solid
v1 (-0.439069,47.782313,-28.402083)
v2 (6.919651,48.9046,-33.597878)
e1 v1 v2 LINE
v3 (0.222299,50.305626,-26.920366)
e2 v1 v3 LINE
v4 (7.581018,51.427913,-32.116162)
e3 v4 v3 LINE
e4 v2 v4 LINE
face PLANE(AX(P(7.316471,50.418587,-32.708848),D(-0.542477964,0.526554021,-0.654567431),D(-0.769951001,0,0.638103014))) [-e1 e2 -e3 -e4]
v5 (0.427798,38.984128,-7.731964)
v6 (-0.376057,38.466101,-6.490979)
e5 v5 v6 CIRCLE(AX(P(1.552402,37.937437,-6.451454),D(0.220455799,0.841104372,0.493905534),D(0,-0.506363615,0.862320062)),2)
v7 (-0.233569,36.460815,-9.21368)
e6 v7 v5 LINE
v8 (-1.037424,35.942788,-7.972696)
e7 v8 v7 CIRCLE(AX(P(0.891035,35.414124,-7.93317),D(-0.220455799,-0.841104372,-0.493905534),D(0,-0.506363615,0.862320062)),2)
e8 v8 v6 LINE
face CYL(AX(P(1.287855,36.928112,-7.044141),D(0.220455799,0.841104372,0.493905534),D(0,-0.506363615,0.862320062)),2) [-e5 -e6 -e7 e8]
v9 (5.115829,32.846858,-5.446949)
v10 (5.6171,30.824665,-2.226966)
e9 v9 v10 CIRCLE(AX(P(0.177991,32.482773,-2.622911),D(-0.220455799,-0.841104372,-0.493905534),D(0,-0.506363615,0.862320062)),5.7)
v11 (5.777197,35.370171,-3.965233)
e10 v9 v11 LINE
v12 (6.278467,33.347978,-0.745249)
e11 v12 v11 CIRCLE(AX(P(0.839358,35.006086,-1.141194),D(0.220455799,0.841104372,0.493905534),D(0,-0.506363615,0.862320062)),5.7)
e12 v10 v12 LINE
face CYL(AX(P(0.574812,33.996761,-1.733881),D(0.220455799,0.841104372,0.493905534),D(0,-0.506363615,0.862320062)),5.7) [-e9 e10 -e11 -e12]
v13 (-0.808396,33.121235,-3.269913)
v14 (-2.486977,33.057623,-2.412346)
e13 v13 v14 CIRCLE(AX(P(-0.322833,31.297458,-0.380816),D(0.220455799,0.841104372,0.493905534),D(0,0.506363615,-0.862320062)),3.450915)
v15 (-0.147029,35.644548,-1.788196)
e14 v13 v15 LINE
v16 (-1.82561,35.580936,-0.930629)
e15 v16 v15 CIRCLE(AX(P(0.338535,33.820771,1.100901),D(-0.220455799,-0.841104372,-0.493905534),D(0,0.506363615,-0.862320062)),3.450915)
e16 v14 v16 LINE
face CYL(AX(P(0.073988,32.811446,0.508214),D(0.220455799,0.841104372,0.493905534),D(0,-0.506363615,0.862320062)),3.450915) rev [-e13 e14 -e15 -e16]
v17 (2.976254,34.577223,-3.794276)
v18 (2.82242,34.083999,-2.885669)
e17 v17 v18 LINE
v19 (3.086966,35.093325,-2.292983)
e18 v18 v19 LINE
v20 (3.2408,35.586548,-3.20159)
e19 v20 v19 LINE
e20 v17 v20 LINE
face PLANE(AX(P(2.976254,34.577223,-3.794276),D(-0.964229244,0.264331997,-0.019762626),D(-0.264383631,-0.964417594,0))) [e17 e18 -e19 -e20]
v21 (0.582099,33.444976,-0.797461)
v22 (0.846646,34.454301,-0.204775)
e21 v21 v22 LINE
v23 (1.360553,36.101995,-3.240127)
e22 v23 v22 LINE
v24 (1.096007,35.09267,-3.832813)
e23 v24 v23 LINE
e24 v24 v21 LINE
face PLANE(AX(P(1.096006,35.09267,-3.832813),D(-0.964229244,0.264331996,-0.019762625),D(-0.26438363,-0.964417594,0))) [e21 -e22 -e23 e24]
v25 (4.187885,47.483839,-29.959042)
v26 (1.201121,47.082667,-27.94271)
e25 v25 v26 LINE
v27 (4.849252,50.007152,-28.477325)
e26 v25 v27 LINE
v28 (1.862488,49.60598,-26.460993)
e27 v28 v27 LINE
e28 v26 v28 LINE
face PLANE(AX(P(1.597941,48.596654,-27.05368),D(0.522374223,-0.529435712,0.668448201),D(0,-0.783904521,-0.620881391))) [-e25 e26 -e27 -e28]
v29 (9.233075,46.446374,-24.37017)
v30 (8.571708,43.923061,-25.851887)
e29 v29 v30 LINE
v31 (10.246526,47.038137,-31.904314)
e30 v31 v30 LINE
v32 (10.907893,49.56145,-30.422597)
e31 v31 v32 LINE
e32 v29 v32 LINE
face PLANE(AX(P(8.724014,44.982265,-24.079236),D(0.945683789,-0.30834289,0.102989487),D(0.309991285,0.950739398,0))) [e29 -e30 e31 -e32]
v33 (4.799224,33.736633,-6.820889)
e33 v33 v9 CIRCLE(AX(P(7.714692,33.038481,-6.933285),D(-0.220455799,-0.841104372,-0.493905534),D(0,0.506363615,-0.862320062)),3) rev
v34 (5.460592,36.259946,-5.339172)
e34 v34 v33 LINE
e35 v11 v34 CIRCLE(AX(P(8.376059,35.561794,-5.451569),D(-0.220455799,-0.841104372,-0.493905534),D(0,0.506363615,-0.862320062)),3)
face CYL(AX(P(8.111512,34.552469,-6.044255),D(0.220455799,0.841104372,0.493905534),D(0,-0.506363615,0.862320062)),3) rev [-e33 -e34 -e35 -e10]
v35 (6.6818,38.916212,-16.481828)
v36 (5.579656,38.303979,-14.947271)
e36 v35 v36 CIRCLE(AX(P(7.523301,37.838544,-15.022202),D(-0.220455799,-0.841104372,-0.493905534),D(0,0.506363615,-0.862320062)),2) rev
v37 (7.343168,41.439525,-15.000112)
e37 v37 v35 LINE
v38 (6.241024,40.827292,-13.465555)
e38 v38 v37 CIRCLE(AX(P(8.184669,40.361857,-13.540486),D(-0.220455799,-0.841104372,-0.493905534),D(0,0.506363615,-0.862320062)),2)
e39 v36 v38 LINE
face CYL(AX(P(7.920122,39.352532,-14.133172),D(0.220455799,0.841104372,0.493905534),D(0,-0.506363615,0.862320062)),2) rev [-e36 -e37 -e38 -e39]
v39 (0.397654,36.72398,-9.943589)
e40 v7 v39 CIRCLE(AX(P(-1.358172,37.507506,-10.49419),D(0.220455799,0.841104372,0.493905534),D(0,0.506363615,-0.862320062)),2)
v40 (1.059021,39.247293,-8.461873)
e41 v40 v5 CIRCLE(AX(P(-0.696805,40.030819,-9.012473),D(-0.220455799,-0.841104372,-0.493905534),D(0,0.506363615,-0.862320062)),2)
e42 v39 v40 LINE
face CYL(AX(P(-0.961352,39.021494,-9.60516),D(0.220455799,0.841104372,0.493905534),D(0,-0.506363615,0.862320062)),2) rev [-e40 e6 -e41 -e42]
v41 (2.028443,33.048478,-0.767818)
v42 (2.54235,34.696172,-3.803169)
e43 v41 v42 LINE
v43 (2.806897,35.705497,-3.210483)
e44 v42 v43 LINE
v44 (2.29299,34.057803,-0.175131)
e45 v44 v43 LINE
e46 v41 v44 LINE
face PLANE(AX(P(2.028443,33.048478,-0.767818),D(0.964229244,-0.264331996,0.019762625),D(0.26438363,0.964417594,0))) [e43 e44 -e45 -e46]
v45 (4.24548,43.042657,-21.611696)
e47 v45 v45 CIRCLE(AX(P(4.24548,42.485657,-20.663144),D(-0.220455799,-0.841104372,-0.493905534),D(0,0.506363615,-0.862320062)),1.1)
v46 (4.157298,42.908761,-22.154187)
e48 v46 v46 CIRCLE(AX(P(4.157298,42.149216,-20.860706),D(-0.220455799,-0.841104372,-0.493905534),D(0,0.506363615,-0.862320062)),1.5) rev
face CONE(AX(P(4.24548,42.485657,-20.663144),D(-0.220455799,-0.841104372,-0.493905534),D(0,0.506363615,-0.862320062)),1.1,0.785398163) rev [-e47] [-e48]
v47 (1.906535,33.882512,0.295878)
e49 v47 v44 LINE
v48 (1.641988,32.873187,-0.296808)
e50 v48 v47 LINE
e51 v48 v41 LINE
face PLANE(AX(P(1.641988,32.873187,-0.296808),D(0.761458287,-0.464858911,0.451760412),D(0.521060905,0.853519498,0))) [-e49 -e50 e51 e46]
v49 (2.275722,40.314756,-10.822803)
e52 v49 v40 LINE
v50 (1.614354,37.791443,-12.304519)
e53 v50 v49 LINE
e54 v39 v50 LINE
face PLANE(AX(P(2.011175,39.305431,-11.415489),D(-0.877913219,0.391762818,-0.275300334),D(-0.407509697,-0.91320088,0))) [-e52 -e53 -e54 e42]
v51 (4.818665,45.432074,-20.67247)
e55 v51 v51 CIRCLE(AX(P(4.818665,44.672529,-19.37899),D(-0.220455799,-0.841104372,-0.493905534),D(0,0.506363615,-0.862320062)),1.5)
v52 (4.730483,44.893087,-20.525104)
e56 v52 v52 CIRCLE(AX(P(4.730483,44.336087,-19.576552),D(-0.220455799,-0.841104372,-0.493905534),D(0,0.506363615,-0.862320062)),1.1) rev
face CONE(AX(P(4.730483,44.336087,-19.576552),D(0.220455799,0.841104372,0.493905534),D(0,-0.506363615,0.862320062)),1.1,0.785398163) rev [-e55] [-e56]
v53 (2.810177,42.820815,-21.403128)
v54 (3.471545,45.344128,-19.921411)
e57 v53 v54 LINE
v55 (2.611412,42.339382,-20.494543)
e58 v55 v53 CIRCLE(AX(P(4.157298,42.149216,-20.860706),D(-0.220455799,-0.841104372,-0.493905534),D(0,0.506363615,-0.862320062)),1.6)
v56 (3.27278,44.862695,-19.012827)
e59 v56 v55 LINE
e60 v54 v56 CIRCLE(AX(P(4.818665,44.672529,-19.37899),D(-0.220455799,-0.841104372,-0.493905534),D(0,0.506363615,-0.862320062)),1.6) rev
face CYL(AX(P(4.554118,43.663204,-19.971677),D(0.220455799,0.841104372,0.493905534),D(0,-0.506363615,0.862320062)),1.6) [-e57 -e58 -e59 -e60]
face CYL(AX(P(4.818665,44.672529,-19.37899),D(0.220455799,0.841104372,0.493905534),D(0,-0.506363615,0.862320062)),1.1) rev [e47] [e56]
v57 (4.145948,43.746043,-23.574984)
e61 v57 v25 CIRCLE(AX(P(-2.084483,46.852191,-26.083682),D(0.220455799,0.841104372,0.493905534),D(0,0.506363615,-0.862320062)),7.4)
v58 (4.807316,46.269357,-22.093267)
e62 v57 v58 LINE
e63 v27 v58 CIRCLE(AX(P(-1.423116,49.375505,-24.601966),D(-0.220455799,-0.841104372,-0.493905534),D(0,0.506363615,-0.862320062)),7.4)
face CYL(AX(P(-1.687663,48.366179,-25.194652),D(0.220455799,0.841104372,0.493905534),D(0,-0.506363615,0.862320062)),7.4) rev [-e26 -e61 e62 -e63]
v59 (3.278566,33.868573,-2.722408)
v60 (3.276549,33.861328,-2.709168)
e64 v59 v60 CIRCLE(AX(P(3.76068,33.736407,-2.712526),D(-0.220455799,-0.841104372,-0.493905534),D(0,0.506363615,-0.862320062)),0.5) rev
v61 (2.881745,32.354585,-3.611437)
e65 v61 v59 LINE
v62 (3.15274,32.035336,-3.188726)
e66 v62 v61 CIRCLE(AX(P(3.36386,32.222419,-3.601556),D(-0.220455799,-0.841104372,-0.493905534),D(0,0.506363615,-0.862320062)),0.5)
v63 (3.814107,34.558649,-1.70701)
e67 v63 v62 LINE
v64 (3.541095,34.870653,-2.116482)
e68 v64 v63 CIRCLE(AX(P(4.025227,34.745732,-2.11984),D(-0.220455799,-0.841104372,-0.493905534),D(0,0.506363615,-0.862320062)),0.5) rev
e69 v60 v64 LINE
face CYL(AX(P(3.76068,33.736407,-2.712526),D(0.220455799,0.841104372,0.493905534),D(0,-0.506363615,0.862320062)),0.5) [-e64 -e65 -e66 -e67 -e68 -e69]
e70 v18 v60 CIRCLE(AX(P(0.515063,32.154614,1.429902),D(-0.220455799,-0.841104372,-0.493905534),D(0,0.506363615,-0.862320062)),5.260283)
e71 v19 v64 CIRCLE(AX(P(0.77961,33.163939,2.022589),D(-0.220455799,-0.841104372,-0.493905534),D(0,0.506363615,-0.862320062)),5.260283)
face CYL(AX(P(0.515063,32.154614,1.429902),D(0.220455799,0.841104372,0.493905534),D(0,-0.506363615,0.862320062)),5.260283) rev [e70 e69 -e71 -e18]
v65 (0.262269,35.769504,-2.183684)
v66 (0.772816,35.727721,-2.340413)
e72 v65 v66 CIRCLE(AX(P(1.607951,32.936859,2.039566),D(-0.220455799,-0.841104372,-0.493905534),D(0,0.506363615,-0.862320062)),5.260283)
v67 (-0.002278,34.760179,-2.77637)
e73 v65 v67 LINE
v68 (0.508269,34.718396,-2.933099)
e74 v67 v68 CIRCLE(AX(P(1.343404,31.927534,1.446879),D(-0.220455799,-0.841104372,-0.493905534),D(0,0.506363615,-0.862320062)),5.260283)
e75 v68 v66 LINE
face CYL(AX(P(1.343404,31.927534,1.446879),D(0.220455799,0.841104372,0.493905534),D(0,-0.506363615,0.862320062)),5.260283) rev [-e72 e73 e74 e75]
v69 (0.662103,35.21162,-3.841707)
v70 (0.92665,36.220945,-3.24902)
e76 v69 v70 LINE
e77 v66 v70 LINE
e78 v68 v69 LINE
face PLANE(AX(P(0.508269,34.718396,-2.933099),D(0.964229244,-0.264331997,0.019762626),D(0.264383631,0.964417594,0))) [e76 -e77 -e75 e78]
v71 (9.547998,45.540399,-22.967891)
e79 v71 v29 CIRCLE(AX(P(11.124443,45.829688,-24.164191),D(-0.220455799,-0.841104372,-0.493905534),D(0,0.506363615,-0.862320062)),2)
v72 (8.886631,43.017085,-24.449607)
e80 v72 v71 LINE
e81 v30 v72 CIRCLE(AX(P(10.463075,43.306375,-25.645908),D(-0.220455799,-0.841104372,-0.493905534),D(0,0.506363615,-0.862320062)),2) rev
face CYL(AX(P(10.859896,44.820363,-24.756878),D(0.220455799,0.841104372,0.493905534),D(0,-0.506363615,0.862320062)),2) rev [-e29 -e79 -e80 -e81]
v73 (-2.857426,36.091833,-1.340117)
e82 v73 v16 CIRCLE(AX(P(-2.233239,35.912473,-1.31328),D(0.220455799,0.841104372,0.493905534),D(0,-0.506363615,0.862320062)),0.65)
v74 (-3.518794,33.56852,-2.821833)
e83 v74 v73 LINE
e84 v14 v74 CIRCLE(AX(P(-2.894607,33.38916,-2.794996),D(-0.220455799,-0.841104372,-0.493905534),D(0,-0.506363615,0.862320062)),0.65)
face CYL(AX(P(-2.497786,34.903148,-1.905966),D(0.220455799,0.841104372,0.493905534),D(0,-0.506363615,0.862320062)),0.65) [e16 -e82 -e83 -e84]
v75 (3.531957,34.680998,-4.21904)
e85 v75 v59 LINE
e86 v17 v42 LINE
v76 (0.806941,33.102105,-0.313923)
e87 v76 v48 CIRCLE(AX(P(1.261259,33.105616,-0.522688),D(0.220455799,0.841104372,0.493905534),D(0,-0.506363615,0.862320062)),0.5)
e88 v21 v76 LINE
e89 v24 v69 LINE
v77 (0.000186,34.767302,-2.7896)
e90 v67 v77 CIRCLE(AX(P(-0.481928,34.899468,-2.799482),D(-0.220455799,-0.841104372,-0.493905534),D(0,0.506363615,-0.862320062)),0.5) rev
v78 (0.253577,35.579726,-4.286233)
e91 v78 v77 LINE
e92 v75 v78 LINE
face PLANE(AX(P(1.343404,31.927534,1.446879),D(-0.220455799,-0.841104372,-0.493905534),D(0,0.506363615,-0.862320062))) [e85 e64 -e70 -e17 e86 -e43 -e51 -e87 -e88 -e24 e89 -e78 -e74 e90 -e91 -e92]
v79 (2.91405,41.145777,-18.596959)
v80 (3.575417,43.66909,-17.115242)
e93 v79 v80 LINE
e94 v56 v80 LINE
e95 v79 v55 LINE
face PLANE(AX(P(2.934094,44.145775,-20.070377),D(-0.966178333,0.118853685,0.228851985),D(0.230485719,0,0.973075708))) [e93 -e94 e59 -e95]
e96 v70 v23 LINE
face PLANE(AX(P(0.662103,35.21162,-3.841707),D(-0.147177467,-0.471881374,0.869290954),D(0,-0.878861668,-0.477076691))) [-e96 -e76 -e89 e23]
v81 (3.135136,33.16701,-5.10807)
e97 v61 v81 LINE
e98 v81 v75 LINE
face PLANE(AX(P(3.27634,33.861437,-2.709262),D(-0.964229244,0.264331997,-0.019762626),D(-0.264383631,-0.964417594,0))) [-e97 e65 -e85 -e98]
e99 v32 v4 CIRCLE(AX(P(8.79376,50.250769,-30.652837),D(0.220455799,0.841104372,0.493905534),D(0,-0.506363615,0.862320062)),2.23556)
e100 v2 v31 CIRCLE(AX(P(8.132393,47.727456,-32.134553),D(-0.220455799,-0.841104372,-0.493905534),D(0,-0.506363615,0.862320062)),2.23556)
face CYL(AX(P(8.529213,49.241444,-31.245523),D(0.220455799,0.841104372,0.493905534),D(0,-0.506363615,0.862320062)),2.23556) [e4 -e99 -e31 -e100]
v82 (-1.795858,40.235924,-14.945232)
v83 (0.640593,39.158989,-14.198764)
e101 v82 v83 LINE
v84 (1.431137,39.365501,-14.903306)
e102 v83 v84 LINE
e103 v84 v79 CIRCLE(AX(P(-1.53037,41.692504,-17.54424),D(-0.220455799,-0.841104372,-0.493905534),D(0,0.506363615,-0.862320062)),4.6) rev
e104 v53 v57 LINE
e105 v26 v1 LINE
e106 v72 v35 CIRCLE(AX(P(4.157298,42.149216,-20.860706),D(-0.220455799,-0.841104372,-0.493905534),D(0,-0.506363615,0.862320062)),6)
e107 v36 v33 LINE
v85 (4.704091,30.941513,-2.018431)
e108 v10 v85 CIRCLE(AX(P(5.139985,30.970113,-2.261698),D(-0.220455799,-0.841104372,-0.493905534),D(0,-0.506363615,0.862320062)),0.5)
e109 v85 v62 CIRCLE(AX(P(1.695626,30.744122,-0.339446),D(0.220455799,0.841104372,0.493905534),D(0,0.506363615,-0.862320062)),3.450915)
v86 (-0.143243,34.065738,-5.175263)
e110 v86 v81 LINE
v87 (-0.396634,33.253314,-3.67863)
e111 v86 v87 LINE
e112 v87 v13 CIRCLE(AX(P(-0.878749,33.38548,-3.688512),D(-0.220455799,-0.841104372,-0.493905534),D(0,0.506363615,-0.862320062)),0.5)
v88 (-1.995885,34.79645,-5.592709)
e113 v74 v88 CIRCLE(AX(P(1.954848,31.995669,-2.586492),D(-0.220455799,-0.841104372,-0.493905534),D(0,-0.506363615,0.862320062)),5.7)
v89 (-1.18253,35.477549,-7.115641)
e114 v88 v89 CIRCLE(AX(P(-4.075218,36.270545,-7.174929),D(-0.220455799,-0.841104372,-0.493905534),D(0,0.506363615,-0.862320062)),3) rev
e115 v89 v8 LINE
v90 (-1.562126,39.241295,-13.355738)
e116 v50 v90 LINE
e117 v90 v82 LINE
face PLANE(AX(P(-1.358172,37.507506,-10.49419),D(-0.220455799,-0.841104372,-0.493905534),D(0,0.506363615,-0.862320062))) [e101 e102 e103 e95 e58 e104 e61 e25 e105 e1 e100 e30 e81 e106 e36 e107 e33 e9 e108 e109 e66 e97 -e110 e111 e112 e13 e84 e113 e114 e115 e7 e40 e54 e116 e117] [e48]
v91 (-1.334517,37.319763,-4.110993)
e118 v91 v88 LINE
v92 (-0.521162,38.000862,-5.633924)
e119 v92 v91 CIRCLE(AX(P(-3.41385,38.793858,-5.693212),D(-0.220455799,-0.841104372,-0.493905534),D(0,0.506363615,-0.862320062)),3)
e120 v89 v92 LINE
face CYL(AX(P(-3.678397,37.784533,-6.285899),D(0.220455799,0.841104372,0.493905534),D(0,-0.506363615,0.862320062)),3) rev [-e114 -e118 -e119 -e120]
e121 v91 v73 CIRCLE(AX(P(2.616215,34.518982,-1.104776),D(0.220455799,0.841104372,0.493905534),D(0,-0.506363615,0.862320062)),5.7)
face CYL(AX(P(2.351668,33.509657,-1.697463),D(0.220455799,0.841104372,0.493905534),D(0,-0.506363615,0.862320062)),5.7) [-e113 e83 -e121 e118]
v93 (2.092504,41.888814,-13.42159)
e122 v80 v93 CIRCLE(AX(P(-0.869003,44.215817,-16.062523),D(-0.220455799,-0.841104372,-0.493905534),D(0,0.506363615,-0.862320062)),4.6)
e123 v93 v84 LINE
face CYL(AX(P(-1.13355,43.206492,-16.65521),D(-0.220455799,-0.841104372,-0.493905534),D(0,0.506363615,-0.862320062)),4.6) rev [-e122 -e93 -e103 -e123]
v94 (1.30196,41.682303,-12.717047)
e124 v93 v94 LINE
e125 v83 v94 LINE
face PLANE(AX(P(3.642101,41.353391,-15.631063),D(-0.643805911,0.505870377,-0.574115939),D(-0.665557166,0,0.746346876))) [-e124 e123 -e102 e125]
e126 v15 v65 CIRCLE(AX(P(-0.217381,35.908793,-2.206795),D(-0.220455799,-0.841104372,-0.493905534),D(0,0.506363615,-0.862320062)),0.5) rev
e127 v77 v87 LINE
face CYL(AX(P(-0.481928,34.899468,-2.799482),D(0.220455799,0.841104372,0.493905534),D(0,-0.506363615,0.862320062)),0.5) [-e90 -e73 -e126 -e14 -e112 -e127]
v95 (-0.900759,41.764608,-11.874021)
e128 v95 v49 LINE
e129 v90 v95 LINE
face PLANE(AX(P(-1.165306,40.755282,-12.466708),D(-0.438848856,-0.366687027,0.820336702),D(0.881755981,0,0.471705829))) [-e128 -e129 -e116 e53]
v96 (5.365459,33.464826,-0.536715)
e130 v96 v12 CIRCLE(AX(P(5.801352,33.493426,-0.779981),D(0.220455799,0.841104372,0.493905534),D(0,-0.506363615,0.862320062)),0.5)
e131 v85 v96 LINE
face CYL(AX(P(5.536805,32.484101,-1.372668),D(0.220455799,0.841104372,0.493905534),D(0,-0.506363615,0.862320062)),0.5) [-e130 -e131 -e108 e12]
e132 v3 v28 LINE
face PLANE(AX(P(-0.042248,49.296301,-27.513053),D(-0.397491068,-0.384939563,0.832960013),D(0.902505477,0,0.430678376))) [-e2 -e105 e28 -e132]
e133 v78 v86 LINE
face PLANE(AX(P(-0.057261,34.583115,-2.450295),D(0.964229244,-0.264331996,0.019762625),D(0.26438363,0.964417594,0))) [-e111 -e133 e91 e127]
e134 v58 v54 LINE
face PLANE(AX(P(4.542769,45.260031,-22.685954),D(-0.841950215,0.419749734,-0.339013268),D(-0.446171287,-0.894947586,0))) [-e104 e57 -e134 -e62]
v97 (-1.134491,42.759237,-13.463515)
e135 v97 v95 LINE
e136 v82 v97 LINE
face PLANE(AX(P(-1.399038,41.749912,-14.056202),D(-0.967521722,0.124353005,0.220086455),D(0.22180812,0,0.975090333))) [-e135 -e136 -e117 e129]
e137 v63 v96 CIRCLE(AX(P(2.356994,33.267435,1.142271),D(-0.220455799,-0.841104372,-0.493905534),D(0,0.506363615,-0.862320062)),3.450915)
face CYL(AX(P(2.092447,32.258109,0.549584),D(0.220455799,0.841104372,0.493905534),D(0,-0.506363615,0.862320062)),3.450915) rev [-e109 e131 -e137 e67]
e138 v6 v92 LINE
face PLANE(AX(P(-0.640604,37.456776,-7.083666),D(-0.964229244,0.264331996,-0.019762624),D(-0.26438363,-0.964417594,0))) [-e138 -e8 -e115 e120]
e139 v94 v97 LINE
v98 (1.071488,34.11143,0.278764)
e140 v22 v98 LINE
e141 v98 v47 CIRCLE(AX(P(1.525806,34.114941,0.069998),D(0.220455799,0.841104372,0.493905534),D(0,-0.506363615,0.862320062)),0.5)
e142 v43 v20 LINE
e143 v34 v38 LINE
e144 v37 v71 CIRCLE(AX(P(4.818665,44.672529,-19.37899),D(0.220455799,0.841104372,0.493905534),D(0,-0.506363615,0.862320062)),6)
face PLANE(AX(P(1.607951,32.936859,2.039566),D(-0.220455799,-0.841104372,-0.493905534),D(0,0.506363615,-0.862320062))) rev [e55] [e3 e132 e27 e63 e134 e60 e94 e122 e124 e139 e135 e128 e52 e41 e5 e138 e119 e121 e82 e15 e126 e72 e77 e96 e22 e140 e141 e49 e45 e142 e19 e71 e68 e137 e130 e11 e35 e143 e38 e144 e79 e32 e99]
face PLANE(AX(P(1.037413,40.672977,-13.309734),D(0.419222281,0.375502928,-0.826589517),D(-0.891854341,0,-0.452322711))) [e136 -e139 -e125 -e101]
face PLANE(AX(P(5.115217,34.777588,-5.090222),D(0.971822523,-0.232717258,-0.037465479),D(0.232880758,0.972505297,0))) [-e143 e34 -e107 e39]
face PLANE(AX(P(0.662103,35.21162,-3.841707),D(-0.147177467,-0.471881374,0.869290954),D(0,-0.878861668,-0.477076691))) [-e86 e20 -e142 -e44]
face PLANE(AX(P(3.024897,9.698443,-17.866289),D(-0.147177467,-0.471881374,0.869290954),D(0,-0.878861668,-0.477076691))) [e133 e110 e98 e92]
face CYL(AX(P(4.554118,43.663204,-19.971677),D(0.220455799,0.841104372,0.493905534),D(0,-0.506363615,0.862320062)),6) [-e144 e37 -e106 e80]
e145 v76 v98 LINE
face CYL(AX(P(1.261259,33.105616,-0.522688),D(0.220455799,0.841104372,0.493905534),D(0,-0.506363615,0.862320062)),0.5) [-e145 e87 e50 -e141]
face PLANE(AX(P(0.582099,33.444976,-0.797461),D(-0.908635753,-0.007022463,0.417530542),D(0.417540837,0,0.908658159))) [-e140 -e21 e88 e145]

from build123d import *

# Parameters (mm, degrees)
BOSS_EXTRU_1_DEPTH      = 1.2
BOSS_EXTRU_2_DEPTH      = 1.8
BOSS_EXTRU_3_DEPTH      = 1.2
ENL_V_MAT_EXTRU_1_DEPTH = 0.5
D_GAGEMENT_11_D         = 2.2
D_GAGEMENT_11_DEPTH     = 20.852957306
CHANFREIN1_SIZE         = 0.4
CONG_1_R                = 0.5
CONG_2_R                = 1.6
CONG_3_R                = 2
CONG_4_R                = 3
CONG_5_R                = 4.6


with BuildPart() as part:
    # Esquisse1 → Boss.-Extru.1 (new body)
    with BuildSketch(Plane(origin=(6.407585618, 24.446842904, 14.355449102), x_dir=(-0.9673252584845775, 0.25353864458450015, 0), z_dir=(0.22045579862678236, 0.8411043718426235, 0.49390553400326775))):
        with BuildLine():
            Line((8.3107933, -19.201337536), (8.28703703, -20.246295369))
            Line((8.28703703, -20.246295369), (5.887657003, -20.191747407))
            Line((5.887657003, -20.191747407), (5.911413273, -19.146789578))
            ThreePointArc((5.911413273, -19.146789578), (5.661071779, -19.051658576), (5.415896386, -18.943909805))
            Line((5.415896386, -18.943909805), (5.424424098, -18.568804632))
            ThreePointArc((5.424424098, -18.568804632), (4.220103871, -18.05373822), (3.294482937, -17.126966131))
            ThreePointArc((3.294482937, -17.126966131), (2.75302589, -16.9231517), (2.381681142, -17.366794726))
            ThreePointArc((2.381681142, -17.366794726), (2.674699472, -19.679905075), (3.869384364, -21.682170602))
            Line((3.869384364, -21.682170602), (4.36844048, -33.2537312))
            ThreePointArc((4.36844048, -33.2537312), (0.72021692, -37.984660137), (2.965783206, -43.520782952))
            Line((2.965783206, -43.520782952), (2.014262513, -51.497693901))
            ThreePointArc((2.014262513, -51.497693901), (3.190838358, -53.739695244), (5.705653115, -53.445403756))
            Line((5.705653115, -53.445403756), (12.539385017, -47.469897623))
            Line((12.539385017, -47.469897623), (10.775401018, -46.941589091))
            Line((10.775401018, -46.941589091), (7.98794124, -49.26050339))
            ThreePointArc((7.98794124, -49.26050339), (6.551054488, -45.710950333), (7.080832223, -41.918417408))
            Line((7.080832223, -41.918417408), (8.354436867, -38.910332559))
            Line((8.354436867, -38.910332559), (6.961586789, -33.804829327))
            Line((6.961586789, -33.804829327), (9.308655621, -31.135148323))
            Line((9.308655621, -31.135148323), (11.938540853, -31.993635375))
            Line((11.938540853, -31.993635375), (11.460268944, -30.16561351))
            Line((11.460268944, -30.16561351), (8.019985695, -28.956643067))
            Line((8.019985695, -28.956643067), (8.926287357, -26.241418493))
            ThreePointArc((8.926287357, -26.241418493), (9.144900582, -25.787147852), (9.470162743, -25.401975054))
            ThreePointArc((9.470162743, -25.401975054), (9.938854473, -24.754281649), (10.116412195, -23.974761322))
            Line((10.116412195, -23.974761322), (10.163650136, -21.896924134))
            ThreePointArc((10.163650136, -21.896924134), (11.408775744, -20.142199434), (11.914735193, -18.050931496))
            ThreePointArc((11.914735193, -18.050931496), (11.515962336, -17.420273087), (10.787100814, -17.579993788))
            ThreePointArc((10.787100814, -17.579993788), (9.893990524, -18.276347599), (8.823545803, -18.646080909))
            Line((8.823545803, -18.646080909), (8.815018092, -19.021186079))
            ThreePointArc((8.815018092, -19.021186079), (8.565199371, -19.117681561), (8.3107933, -19.201337536))
        make_face()
    extrude(amount=-BOSS_EXTRU_1_DEPTH)

    # Esquisse2 → Boss.-Extru.2 (add)
    with BuildSketch(Plane(origin=(6.14303866, 23.437517658, 13.762762461), x_dir=(0.975396965779486, -0.19010345790327618, -0.11163079521973214), z_dir=(-0.22045579862678244, -0.8411043718426235, -0.493905534003268))):
        with BuildLine():
            Line((-7.732315065, -33.261580929), (-7.492687467, -31.387284642))
            Line((-7.492687467, -31.387284642), (-4.236084553, -29.746645792))
            Line((-4.236084553, -29.746645792), (-5.483474276, -27.170244025))
            ThreePointArc((-5.483474276, -27.170244025), (-5.758598922, -26.747798778), (-6.130618981, -26.407571451))
            ThreePointArc((-6.130618981, -26.407571451), (-6.6785848, -25.825409837), (-6.954750137, -25.075135626))
            Line((-6.954750137, -25.075135626), (-7.268355612, -23.020557711))
            ThreePointArc((-7.268355612, -23.020557711), (-8.728453798, -21.440206536), (-9.498708997, -19.431200941))
            ThreePointArc((-9.498708997, -19.431200941), (-9.184201764, -18.754565869), (-8.440866411, -18.819391589))
            ThreePointArc((-8.440866411, -18.819391589), (-7.465747068, -19.39532291), (-6.356693226, -19.624569933))
            Line((-6.356693226, -19.624569933), (-6.113459598, -21.218108564))
            Line((-6.113459598, -21.218108564), (-2.752387602, -20.7050832))
            Line((-2.752387602, -20.7050832), (-2.99562123, -19.111544567))
            ThreePointArc((-2.99562123, -19.111544567), (-1.86739276, -18.44612655), (-1.068413166, -17.408190027))
            ThreePointArc((-1.068413166, -17.408190027), (-0.557603097, -17.13654848), (-0.132375231, -17.528845966))
            ThreePointArc((-0.132375231, -17.528845966), (-0.126005289, -19.86043312), (-1.053747455, -21.999506214))
            Line((-1.053747455, -21.999506214), (-0.06308502, -33.539378814))
            ThreePointArc((-0.06308502, -33.539378814), (4.162318019, -37.762788918), (2.646077122, -43.541390591))
            Line((2.646077122, -43.541390591), (4.613821412, -51.330131332))
            ThreePointArc((4.613821412, -51.330131332), (3.734816377, -53.704631466), (1.203030531, -53.735634151))
            Line((1.203030531, -53.735634151), (-6.341302035, -48.686910412))
            Line((-6.341302035, -48.686910412), (-4.659741241, -47.936508686))
            Line((-4.659741241, -47.936508686), (-1.59763996, -49.878371526))
            ThreePointArc((-1.59763996, -49.878371526), (-0.628345248, -46.173720638), (-1.640634697, -42.480586398))
            Line((-1.640634697, -42.480586398), (-3.289886063, -39.660903229))
            Line((-3.289886063, -39.660903229), (-2.564020762, -34.418831676))
            Line((-2.564020762, -34.418831676), (-5.234407859, -32.072566236))
            Line((-5.234407859, -32.072566236), (-7.732315065, -33.261580929))
        make_face()
    extrude(amount=BOSS_EXTRU_2_DEPTH)

    # Esquisse3 → Boss.-Extru.3 (add)
    with BuildSketch(Plane(origin=(6.407585618, 24.446842904, 14.355449102), x_dir=(-0.9673252584845775, 0.25353864458450015, 0), z_dir=(0.22045579862678236, 0.8411043718426235, 0.49390553400326775))):
        with BuildLine():
            Line((7.837153276, -20.236067623), (7.91651501, -16.745213642))
            Line((7.91651501, -16.745213642), (7.612088308, -16.189112778))
            ThreePointArc((7.612088308, -16.189112778), (7.184869542, -15.929335708), (6.746286617, -16.169429478))
            Line((6.746286617, -16.169429478), (6.416902492, -16.711121168))
            Line((6.416902492, -16.711121168), (6.337540759, -20.201975149))
            Line((6.337540759, -20.201975149), (7.837153276, -20.236067623))
        make_face()
    extrude(amount=-BOSS_EXTRU_3_DEPTH)

    # Esquisse4 → Enlèv. mat.-Extru.1 (cut)
    with BuildSketch(Plane(origin=(2.951307786, 9.462502662, -17.431643664), x_dir=(0.9891101016622393, -0.07021493892393531, 0.12934863409260489), z_dir=(-0.1471774669904145, -0.47188137397705354, 0.8692909536535013))):
        Polygon((0.512643013, 28.466993484), (-2.801830697, 29.224795587), (-3.203020046, 27.470074211), (0.111453664, 26.712272108), align=None)
    extrude(amount=-ENL_V_MAT_EXTRU_1_DEPTH, mode=Mode.SUBTRACT)

    # Dégagement #11
    with Locations(Plane(origin=(6.407585618, 24.446842904, 14.355449102), x_dir=(0.975396965779486, -0.19010345790327618, -0.11163079521973214), z_dir=(0.22045579862678244, 0.8411043718426235, 0.493905534003268))):
        with Locations((-1.628998725, 39.331434949)):
            Hole(D_GAGEMENT_11_D / 2, depth=D_GAGEMENT_11_DEPTH)

    # Chanfrein1
    chanfrein1_edges = [part.edges().sort_by_distance(p)[0] for p in [
        (5.230234471, 41.940101873, -20.983500369),
        (5.891601867, 44.463414989, -19.501783767),
    ]]
    chamfer(chanfrein1_edges, length=CHANFREIN1_SIZE)

    # Congé1
    # the kernel refuses this fillet: 0.5 mm, written as the material it takes off along each edge
    with BuildSketch(Plane(origin=(-0.669204138, 32.248368886, -3.821283326), x_dir=(0.1471774658030771, 0.4718813743025472, -0.869290953677837), z_dir=(0.2204557986267829, 0.8411043718426239, 0.4939055340032671))) as cong_1_piece_1_section:
        with BuildLine():
            CenterArc((0.390324185, 0.5), CONG_1_R, 196.972621799, 73.027378201)
            ThreePointArc((-0.087897992, 0.354042645), (-0.039267564, 0.178183579), (0, 0))
            Line((0, 0), (0.390324185, 0))
        make_face()
    cong_1_piece_1 = extrude(amount=4.951620926, mode=Mode.PRIVATE)
    cong_1_piece_1 = split(cong_1_piece_1, bisect_by=Plane(origin=(0.003725605, 34.762970093, -2.783803292), z_dir=(-0.22045579862678238, -0.8411043718426235, -0.4939055340032678)), keep=Keep.TOP, mode=Mode.PRIVATE)
    cong_1_piece_1 = cong_1_piece_1 - Plane(origin=(1.037432714, 30.760160969, 0.761385364), x_dir=(-0.25577403854650904, 0.5384942223933797, -0.8028721029245929), z_dir=(0.22045579862678244, 0.8411043718426237, 0.49390553400326787)) * Cylinder(5.260282908, 12, mode=Mode.PRIVATE)
    add(cong_1_piece_1, mode=Mode.SUBTRACT)
    with BuildSketch(Plane(origin=(-0.669204138, 32.248368886, -3.821283326), x_dir=(0.1471774658030771, 0.4718813743025472, -0.869290953677837), z_dir=(0.2204557986267829, 0.8411043718426239, 0.4939055340032671))) as cong_1_piece_2_section:
        with BuildLine():
            CenterArc((0.390324185, 0.5), CONG_1_R, 196.972621799, 73.027378201)
            ThreePointArc((-0.087897992, 0.354042645), (-0.039267564, 0.178183579), (0, 0))
            Line((0, 0), (0.390324185, 0))
        make_face()
    cong_1_piece_2 = extrude(amount=4.951620926, mode=Mode.PRIVATE)
    cong_1_piece_2 = split(cong_1_piece_2, bisect_by=Plane(origin=(-0.122705541, 34.636774261, -2.512463256), z_dir=(-0.22045579862678238, -0.8411043718426235, -0.4939055340032678)), keep=Keep.TOP, mode=Mode.PRIVATE)
    cong_1_piece_2 = cong_1_piece_2 & Plane(origin=(1.037432714, 30.760160969, 0.761385364), x_dir=(-0.25577403854650904, 0.5384942223933797, -0.8028721029245929), z_dir=(0.22045579862678244, 0.8411043718426237, 0.49390553400326787)) * Cylinder(5.260282908, 12, mode=Mode.PRIVATE)
    add(cong_1_piece_2, mode=Mode.SUBTRACT)
    with BuildSketch(Plane(origin=(-0.669204138, 32.248368886, -3.821283326), x_dir=(0.1471774658030771, 0.4718813743025472, -0.869290953677837), z_dir=(0.2204557986267829, 0.8411043718426239, 0.4939055340032671))) as cong_1_piece_3_section:
        with BuildLine():
            CenterArc((0.390324185, 0.5), CONG_1_R, 196.972621799, 73.027378201)
            ThreePointArc((-0.087897992, 0.354042645), (-0.039267564, 0.178183579), (0, 0))
            Line((0, 0), (0.390324185, 0))
        make_face()
    cong_1_piece_3 = extrude(amount=4.951620926, mode=Mode.PRIVATE)
    cong_1_piece_3 = split(cong_1_piece_3, bisect_by=Plane(origin=(-0.122705541, 34.636774261, -2.512463256), z_dir=(0.22045579862678238, 0.8411043718426235, 0.4939055340032678)), keep=Keep.TOP, mode=Mode.PRIVATE)
    cong_1_piece_3 = cong_1_piece_3 & Plane(origin=(1.583239487, 32.842575973, 1.984201853), x_dir=(-0.25577403854650904, 0.5384942223933797, -0.8028721029245929), z_dir=(0.22045579862678244, 0.8411043718426237, 0.49390553400326787)) * Cylinder(5.260282908, 12, mode=Mode.PRIVATE)
    add(cong_1_piece_3, mode=Mode.SUBTRACT)
    with BuildSketch(Plane(origin=(3.221118801, 33.684386414, -2.383102251), x_dir=(0.9003564842206884, -0.3702458044391333, 0.22863999128975734), z_dir=(-0.22045579862678244, -0.8411043718426235, -0.493905534003268))) as cong_1_piece_4:
        with BuildLine():
            CenterArc((0.391217792, -0.49930112), CONG_1_R, 93.029734023, 73.027378136)
            Line((-0.094050404, -0.378823825), (0, 0))
            ThreePointArc((0, 0), (0.182395347, -0.004823551), (0.364790694, 0))
        make_face()
    extrude(amount=2.775810462, mode=Mode.SUBTRACT)
    with BuildSketch(Plane(origin=(3.700788834, 35.514470106, -1.308457423), x_dir=(0.9003564842006331, -0.37024580446021027, 0.2286399913346027), z_dir=(-0.22045579862678238, -0.8411043718426237, -0.49390553400326787))) as cong_1_piece_5_section:
        with BuildLine():
            CenterArc((0.391217792, -0.49930112), CONG_1_R, 93.029734026, 73.027378189)
            Line((-0.094050403, -0.378823826), (0, 0))
            ThreePointArc((0, 0), (0.182395347, -0.004823551), (0.364790695, 0))
        make_face()
    cong_1_piece_5 = extrude(amount=2.175810463, mode=Mode.PRIVATE)
    cong_1_piece_5 = cong_1_piece_5 & Plane(origin=(0.754897734, 33.069656027, 1.967224347), x_dir=(0.43863740070273427, 0.36678352616314214, -0.8204066526059384), z_dir=(0.22045579862678238, 0.8411043718426235, 0.4939055340032678)) * Cylinder(5.260282909, 6, mode=Mode.PRIVATE)
    add(cong_1_piece_5, mode=Mode.SUBTRACT)

    # Congé2
    cong_2_edges = [part.edges().sort_by_distance(p)[0] for p in [
        (2.867957036, 43.89344341, -20.218549127),
    ]]
    fillet(cong_2_edges, radius=CONG_2_R)

    # Congé3
    cong_3_edges = [part.edges().sort_by_distance(p)[0] for p in [
        (8.657877516, 44.729933893, -24.227407519),
        (6.015368983, 40.18030014, -15.300046181),
    ]]
    fillet(cong_3_edges, radius=CONG_3_R)

    # Congé4
    cong_4_edges = [part.edges().sort_by_distance(p)[0] for p in [
        (-1.01263009, 36.223698711, -5.425125631),
        (5.04907985, 34.525256884, -5.238394092),
    ]]
    fillet(cong_4_edges, radius=CONG_4_R)

    # Congé5
    cong_5_edges = [part.edges().sort_by_distance(p)[0] for p in [
        (3.575963848, 41.101059603, -15.779234582),
    ]]
    fillet(cong_5_edges, radius=CONG_5_R)


solid = part.part
